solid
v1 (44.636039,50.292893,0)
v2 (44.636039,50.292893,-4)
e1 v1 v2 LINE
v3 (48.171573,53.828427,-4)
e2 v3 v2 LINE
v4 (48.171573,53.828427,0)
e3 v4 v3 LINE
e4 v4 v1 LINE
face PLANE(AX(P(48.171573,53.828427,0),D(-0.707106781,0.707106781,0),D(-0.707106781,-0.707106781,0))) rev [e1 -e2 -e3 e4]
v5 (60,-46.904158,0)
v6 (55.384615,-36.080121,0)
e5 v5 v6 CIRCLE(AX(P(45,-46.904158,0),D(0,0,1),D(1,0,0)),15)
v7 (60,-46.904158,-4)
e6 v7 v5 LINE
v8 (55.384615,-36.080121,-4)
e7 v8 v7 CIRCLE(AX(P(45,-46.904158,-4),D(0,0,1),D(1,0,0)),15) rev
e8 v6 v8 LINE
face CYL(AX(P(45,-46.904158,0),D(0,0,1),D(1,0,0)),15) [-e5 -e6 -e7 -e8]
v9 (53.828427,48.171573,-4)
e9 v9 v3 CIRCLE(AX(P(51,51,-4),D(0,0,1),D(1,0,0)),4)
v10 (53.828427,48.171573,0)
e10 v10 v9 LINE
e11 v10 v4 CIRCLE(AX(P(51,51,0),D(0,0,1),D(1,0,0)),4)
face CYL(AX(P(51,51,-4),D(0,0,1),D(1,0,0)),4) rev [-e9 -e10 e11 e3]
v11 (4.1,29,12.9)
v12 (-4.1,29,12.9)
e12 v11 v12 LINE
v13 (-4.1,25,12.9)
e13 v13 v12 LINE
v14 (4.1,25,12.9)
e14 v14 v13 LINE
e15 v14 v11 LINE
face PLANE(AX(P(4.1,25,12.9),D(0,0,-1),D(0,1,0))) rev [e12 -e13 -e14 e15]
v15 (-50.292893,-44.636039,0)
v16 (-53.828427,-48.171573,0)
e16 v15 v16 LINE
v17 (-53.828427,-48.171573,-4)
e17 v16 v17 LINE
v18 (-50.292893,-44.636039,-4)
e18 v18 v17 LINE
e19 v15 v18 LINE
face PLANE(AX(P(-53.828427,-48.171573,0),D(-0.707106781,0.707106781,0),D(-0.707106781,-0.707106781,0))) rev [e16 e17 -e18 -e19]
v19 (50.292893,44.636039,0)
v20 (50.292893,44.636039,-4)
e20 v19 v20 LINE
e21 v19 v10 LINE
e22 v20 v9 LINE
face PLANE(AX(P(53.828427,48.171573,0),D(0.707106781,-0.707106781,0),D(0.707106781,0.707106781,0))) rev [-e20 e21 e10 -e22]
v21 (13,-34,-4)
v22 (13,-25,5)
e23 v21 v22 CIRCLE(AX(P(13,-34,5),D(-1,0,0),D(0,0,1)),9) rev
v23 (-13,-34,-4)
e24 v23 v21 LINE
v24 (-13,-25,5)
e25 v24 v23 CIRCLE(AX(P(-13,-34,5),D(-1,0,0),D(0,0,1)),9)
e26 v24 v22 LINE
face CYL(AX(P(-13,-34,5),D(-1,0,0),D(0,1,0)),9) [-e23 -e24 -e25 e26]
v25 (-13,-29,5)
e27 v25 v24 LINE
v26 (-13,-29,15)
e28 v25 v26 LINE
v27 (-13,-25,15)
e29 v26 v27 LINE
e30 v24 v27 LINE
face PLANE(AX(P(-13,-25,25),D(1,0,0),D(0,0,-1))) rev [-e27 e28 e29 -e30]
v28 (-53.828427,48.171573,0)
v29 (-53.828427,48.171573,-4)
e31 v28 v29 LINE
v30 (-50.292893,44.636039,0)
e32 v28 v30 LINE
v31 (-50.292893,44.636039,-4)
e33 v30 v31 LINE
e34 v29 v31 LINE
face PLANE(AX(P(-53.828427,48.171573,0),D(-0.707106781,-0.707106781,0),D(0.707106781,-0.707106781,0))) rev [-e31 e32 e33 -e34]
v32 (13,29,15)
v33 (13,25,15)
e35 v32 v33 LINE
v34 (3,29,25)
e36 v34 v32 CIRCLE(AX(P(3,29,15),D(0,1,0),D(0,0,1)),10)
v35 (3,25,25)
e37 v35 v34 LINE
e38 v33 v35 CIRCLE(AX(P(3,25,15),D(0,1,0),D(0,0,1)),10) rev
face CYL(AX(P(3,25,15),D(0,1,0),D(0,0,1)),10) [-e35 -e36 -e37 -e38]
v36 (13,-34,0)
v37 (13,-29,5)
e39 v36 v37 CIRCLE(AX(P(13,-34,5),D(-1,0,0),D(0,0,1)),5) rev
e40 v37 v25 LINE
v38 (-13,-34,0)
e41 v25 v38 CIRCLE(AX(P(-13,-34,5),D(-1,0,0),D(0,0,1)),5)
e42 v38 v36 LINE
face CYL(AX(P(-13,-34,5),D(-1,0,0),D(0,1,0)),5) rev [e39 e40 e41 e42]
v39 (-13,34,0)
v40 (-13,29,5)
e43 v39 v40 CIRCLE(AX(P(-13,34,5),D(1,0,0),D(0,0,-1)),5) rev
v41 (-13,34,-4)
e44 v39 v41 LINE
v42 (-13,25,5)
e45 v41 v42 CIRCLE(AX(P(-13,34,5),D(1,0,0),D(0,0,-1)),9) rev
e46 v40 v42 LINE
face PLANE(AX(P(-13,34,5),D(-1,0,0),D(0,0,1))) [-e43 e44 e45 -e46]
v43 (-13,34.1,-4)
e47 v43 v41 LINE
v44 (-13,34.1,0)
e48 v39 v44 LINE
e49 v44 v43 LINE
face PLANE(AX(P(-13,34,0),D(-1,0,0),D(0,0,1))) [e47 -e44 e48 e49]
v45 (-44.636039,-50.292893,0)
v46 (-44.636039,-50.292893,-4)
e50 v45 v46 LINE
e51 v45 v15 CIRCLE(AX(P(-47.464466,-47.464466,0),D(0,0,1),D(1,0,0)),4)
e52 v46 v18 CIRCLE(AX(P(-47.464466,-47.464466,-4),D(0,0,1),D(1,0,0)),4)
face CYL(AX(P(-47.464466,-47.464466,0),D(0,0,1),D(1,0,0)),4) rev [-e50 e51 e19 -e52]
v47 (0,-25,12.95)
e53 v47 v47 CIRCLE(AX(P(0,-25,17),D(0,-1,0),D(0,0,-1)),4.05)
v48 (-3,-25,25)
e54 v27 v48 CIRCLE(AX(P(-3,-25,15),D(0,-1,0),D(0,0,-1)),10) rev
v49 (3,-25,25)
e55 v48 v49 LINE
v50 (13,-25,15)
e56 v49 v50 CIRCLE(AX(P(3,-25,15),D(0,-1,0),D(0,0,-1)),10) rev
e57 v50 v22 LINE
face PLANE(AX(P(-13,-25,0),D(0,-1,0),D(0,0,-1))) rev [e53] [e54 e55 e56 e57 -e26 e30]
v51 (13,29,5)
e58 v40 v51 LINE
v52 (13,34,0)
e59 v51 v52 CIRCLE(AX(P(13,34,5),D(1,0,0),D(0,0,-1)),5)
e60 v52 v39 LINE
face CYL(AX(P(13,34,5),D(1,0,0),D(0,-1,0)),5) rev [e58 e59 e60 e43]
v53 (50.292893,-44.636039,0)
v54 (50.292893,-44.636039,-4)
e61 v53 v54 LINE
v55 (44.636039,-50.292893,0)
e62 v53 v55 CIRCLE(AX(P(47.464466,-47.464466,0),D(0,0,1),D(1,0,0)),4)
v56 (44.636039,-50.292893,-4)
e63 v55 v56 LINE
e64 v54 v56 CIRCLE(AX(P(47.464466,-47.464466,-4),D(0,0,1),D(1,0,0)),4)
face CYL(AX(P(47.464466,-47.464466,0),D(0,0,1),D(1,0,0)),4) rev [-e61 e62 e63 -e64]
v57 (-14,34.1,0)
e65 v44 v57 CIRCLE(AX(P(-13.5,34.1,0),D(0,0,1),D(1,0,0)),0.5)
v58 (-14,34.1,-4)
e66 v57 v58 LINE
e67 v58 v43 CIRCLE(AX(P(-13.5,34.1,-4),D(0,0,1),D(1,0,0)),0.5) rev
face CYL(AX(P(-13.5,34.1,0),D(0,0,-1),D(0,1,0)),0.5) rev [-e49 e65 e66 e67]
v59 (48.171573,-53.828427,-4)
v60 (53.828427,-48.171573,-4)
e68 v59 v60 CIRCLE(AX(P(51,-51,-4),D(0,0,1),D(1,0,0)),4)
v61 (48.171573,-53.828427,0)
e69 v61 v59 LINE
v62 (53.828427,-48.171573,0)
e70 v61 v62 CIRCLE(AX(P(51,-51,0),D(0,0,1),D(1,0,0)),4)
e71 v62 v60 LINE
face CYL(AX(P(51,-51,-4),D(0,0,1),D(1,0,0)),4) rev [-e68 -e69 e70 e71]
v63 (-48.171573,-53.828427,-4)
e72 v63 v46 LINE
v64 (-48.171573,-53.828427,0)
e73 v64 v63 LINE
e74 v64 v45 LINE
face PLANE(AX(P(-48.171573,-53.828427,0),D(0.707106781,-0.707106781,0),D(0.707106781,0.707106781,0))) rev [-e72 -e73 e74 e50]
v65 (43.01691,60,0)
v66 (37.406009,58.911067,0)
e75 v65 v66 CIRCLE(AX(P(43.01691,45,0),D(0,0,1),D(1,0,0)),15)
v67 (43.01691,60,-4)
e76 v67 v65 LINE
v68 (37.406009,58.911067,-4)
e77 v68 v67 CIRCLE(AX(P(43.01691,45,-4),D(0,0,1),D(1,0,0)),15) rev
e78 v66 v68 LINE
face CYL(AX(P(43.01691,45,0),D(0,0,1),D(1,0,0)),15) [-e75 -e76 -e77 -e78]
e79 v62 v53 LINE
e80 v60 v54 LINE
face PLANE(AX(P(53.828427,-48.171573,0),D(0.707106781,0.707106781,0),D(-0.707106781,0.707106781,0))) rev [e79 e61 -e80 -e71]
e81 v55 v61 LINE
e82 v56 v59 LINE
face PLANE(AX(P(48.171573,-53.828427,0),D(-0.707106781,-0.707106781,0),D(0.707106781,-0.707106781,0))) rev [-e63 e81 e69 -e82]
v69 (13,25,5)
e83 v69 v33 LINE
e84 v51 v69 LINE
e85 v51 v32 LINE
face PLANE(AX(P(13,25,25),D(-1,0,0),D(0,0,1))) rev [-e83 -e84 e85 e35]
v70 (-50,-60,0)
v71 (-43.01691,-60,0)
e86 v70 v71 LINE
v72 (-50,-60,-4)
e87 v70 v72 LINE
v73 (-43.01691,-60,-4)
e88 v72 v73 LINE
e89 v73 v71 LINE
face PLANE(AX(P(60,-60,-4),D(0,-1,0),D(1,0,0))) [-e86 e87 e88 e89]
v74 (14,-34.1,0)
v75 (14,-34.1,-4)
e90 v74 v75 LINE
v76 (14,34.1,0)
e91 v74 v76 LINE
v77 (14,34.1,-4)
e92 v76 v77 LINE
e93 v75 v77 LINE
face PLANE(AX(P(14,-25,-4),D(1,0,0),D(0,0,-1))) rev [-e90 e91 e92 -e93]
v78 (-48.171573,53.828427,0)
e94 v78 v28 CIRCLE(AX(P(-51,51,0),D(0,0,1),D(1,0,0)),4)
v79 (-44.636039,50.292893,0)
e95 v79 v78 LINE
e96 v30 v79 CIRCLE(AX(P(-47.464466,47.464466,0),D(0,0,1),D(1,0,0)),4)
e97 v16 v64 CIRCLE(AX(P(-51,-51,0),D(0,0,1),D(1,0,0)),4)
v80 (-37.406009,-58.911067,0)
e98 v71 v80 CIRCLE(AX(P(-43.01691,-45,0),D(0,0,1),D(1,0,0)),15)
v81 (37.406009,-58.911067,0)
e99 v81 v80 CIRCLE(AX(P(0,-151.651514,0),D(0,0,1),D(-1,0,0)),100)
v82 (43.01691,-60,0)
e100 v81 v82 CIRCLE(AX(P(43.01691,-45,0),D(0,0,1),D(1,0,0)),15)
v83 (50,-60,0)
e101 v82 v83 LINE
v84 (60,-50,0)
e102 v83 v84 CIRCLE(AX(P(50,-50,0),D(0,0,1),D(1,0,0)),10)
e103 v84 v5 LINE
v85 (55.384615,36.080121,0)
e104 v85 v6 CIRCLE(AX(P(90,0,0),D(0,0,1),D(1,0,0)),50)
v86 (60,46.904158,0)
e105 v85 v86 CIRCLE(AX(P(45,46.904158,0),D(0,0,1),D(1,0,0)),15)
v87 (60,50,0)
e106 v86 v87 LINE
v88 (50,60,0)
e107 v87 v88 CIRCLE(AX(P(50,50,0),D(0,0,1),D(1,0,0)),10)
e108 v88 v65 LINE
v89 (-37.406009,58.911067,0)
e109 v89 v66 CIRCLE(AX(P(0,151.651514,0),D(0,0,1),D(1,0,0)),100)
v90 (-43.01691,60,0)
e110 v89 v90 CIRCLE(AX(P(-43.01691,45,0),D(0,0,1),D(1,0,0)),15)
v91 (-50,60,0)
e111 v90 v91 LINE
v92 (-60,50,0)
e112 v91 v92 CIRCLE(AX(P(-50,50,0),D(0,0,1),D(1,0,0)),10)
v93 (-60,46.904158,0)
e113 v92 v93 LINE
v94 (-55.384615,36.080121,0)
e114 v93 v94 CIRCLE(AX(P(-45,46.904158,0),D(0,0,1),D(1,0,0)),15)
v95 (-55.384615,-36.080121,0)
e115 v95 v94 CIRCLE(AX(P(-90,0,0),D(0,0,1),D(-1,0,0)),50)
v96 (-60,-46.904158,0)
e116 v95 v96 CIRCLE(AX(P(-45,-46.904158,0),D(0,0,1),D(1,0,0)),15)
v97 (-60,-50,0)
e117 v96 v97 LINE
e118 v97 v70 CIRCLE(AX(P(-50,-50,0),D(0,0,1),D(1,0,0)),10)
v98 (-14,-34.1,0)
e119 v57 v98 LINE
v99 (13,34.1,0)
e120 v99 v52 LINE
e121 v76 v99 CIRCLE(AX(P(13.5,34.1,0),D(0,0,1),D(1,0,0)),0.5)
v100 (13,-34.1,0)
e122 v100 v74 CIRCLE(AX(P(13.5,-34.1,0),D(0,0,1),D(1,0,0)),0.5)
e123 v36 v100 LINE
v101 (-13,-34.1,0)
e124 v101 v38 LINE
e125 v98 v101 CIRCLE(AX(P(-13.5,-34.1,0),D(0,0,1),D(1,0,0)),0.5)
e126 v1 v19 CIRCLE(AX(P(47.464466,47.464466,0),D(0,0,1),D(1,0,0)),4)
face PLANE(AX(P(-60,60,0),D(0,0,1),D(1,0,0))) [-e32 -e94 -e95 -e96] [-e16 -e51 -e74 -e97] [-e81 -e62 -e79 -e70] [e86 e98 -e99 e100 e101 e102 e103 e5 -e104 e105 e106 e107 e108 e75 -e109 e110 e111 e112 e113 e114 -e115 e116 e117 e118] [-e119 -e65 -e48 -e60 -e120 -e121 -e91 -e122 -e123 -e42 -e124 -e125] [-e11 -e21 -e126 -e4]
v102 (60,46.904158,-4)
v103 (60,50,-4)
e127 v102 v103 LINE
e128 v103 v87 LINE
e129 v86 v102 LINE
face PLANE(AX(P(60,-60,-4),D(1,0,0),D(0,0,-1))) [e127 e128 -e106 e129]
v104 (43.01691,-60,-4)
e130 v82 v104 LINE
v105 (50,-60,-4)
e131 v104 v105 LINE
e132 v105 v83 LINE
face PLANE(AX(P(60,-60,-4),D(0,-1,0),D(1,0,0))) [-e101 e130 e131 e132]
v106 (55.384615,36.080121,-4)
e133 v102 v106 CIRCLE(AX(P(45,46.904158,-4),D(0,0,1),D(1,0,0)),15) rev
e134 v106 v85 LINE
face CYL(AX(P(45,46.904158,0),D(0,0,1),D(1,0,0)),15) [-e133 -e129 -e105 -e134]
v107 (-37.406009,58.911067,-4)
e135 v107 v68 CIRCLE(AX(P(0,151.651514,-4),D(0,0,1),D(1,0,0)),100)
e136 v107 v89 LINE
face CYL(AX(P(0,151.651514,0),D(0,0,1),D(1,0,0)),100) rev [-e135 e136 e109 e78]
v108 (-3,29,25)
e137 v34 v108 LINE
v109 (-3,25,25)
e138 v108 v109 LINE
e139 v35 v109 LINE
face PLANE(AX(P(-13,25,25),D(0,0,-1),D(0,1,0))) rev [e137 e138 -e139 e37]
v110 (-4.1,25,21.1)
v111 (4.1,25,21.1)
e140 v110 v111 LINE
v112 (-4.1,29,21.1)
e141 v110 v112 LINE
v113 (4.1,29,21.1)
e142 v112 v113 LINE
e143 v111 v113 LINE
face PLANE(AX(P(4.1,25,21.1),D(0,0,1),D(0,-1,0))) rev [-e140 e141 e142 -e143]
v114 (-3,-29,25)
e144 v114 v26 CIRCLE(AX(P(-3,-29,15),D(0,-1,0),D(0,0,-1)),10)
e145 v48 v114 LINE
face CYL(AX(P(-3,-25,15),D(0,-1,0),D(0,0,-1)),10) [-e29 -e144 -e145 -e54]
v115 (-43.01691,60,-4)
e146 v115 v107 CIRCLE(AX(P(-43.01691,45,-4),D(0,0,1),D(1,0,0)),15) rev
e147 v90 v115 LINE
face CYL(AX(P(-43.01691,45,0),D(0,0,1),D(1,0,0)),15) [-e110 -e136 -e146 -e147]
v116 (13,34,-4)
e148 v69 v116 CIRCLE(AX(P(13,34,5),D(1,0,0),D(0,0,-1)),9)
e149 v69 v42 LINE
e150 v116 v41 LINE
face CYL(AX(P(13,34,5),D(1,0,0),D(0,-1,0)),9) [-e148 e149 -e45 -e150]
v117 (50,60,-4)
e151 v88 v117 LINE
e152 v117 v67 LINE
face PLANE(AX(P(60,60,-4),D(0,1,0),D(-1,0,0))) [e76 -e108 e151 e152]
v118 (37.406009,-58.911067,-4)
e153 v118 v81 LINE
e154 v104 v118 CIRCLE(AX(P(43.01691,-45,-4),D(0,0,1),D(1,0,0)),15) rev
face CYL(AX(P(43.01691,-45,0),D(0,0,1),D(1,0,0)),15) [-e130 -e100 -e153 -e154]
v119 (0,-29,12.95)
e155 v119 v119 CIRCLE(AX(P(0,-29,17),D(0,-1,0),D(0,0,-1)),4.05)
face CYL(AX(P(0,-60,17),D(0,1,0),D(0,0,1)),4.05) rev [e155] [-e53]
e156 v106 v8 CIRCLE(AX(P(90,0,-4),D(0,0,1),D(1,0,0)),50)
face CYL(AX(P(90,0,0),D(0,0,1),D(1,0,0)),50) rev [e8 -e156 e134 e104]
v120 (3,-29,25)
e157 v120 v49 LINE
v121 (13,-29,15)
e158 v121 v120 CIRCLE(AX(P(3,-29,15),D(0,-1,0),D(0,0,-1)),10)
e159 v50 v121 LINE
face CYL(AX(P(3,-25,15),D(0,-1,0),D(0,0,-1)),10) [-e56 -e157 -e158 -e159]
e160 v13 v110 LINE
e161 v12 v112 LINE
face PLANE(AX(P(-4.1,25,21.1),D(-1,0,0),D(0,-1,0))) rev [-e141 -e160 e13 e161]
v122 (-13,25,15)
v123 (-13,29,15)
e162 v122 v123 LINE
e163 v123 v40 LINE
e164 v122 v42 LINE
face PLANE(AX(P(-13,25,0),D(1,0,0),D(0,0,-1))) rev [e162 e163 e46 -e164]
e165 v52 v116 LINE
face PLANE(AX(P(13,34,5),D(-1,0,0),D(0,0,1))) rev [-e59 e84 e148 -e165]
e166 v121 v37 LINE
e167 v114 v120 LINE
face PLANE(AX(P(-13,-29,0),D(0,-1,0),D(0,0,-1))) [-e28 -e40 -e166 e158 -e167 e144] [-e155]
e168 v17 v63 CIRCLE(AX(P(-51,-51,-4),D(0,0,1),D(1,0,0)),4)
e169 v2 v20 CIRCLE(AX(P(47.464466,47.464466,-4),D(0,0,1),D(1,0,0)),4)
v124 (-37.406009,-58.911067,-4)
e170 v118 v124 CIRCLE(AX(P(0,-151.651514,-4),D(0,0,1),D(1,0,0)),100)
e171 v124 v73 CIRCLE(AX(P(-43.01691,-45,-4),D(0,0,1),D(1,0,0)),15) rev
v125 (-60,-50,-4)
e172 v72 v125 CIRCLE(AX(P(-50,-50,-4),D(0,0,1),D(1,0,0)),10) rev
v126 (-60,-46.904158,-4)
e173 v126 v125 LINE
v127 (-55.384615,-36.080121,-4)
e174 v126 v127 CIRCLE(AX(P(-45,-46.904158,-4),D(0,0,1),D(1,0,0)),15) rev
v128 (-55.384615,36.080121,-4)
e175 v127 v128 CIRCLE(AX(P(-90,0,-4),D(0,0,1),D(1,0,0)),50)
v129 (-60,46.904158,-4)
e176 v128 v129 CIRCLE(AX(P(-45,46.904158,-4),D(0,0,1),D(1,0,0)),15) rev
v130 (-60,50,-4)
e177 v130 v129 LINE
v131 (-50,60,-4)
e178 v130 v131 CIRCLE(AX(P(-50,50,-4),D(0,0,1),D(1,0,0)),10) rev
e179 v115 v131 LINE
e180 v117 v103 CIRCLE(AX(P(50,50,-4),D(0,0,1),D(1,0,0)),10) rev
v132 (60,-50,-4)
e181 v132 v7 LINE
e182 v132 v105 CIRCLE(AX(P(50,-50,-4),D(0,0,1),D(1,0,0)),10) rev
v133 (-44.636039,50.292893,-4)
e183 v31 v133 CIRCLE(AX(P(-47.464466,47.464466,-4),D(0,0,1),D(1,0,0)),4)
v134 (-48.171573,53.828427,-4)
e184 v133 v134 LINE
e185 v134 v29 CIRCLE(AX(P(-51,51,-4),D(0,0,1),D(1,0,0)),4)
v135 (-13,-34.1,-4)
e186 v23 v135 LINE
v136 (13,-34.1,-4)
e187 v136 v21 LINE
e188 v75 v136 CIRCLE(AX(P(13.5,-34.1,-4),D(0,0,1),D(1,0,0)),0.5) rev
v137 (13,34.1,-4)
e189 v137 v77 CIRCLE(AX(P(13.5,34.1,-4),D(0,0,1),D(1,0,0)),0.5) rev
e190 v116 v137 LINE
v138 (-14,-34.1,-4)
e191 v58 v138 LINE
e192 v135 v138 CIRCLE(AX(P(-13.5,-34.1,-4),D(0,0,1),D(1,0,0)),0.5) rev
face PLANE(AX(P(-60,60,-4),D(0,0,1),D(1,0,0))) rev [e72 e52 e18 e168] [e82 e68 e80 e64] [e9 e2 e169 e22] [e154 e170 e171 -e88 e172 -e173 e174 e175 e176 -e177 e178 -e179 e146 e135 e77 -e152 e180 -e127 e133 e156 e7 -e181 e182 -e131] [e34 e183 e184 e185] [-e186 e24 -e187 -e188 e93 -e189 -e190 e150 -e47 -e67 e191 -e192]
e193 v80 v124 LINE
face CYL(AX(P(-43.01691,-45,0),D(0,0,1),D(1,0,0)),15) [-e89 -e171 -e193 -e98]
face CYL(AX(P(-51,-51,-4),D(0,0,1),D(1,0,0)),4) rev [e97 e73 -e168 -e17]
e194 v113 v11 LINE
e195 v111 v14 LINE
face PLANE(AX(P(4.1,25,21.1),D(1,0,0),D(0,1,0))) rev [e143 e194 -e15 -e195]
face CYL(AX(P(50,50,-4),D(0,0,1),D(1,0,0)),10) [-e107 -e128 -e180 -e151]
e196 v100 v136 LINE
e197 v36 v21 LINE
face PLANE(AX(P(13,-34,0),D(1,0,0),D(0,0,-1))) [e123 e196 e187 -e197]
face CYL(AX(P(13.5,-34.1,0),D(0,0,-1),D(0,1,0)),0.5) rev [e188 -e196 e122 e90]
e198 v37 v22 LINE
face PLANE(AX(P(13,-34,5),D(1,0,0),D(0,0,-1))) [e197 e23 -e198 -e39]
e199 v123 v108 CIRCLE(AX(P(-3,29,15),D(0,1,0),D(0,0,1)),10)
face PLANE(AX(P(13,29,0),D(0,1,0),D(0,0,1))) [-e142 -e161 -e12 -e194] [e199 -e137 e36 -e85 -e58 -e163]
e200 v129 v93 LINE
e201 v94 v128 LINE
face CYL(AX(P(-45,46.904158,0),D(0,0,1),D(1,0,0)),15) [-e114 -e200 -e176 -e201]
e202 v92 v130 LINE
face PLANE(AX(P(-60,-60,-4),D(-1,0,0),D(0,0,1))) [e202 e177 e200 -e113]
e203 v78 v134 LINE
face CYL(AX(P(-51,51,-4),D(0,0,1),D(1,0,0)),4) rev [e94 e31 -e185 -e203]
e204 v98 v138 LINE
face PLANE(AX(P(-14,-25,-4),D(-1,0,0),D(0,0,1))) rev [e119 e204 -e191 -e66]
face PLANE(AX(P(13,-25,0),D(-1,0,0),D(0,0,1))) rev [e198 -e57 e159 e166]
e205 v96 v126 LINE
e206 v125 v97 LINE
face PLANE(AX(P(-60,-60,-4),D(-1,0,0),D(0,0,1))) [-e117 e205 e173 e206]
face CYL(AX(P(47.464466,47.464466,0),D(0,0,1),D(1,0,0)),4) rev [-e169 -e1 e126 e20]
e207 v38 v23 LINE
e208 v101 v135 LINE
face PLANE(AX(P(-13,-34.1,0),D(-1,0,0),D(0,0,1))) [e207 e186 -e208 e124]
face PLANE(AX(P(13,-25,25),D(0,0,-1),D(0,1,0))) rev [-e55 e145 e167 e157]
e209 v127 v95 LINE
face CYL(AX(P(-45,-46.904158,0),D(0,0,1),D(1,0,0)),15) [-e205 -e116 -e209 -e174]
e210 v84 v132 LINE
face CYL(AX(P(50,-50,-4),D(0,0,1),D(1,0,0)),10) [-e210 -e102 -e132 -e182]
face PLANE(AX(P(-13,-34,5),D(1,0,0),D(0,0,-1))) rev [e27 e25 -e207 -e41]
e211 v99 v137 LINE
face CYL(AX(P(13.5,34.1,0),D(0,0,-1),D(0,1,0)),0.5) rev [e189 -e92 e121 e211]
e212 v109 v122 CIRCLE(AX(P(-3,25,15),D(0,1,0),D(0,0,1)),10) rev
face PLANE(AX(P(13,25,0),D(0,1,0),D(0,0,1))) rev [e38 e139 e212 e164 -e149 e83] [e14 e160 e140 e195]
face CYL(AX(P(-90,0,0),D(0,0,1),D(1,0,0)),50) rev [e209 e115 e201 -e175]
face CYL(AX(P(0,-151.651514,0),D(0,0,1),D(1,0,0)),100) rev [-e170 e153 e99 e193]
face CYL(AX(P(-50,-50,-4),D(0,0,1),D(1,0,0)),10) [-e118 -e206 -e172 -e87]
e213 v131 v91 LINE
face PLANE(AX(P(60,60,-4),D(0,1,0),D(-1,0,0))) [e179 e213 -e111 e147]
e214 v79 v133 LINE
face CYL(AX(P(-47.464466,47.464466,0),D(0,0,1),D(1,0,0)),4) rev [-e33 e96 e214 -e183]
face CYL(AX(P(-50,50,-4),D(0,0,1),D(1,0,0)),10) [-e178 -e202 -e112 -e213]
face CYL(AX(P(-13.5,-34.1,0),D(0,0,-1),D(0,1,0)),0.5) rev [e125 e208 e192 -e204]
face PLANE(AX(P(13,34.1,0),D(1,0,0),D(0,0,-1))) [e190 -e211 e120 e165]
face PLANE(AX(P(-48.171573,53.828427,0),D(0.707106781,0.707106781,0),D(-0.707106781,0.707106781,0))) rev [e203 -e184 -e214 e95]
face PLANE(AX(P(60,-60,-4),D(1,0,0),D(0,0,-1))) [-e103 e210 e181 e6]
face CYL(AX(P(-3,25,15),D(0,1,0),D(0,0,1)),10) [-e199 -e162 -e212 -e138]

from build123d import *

# Parameters (mm, degrees)
SKETCH_1_W                   = 120
SKETCH_1_H                   = 120
SKETCH_1_W_2                 = 28
SKETCH_1_H_2                 = 50
SM_BASE_FLANGE_1_DEPTH       = 4
SM_START                     = -5
SM_EDGE_FLANGE_1_DEPTH       = 10
SM_EDGE_FLANGE_1_2_OUTLINE_W = 26
SM_EDGE_FLANGE_1_2_OUTLINE_H = 4
SM_EDGE_FLANGE_1_2_DEPTH     = 1.41096
SM_START_2                   = 5
SM_EDGE_FLANGE_1_3_OUTLINE_W = 26
SM_EDGE_FLANGE_1_3_OUTLINE_H = 4
SM_EDGE_FLANGE_1_3_DEPTH     = 20
SM_START_3                   = -13
SM_EDGE_FLANGE_1_4_DEPTH     = 26
SM_EDGE_FLANGE_1_5_DEPTH     = 26
CUT_EXTRUDE_1_DEPTH          = 89.459030065
CUT_EXTRUDE_1_DEPTH_BACK     = 89.459030065
SKETCH_10_R                  = 4.05
SKETCH_12_W                  = 8.2
SKETCH_12_H                  = 8.2
CUT_EXTRUDE_3_DEPTH          = 4
FILLET_1_R                   = 10
SKETCH_11_R                  = 4
CUT_EXTRUDE_2_DEPTH          = 4
CUT_EXTRUDE_4_DEPTH          = 4
CUT_EXTRUDE_5_DEPTH          = 4
FILLET_2_R                   = 15


with BuildPart() as part:
    # Базовая кромка1: sheet metal written as solids
    # Sketch 1 → Базовая кромка1 (new body)
    with BuildSketch(Plane.XY):
        Rectangle(SKETCH_1_W, SKETCH_1_H)
        Rectangle(SKETCH_1_W_2, SKETCH_1_H_2, mode=Mode.SUBTRACT)
    extrude(amount=-SM_BASE_FLANGE_1_DEPTH)

    # Ребро-кромка1: read off the stored shape, not the designer's step
    # Ребро-кромка1 outline → Ребро-кромка1 (cut)
    with BuildSketch(Plane.XY.offset(SM_START)):
        with BuildLine():
            ThreePointArc((-13, 34.1), (-13.5, 34.6), (-14, 34.1))
            Line((-14, 34.1), (-14, 25))
            Line((-14, 25), (-13, 25))
            Line((-13, 25), (-13, 34.1))
        make_face()
        with BuildLine():
            Line((-13, -25), (-14, -25))
            Line((-14, -25), (-14, -34.1))
            ThreePointArc((-14, -34.1), (-13.5, -34.6), (-13, -34.1))
            Line((-13, -34.1), (-13, -25))
        make_face()
        with BuildLine():
            Line((13, 34.1), (13, 25))
            Line((13, 25), (14, 25))
            Line((14, 25), (14, 34.1))
            ThreePointArc((14, 34.1), (13.5, 34.6), (13, 34.1))
        make_face()
        with BuildLine():
            Line((14, -25), (13, -25))
            Line((13, -25), (13, -34.1))
            ThreePointArc((13, -34.1), (13.5, -34.6), (14, -34.1))
            Line((14, -34.1), (14, -25))
        make_face()
    extrude(amount=SM_EDGE_FLANGE_1_DEPTH, mode=Mode.SUBTRACT)

    # Sm Edge Flange 1 2 outline → Sm Edge Flange 1 2 (cut)
    with BuildSketch(Plane.XY.offset(SM_START)):
        with Locations((0, 27)):
            Rectangle(SM_EDGE_FLANGE_1_2_OUTLINE_W, SM_EDGE_FLANGE_1_2_OUTLINE_H)
        with Locations((0, -27)):
            Rectangle(SM_EDGE_FLANGE_1_2_OUTLINE_W, SM_EDGE_FLANGE_1_2_OUTLINE_H)
    extrude(amount=SM_EDGE_FLANGE_1_2_DEPTH, mode=Mode.SUBTRACT)

    # Sm Edge Flange 1 4 outline → Sm Edge Flange 1 4 (cut)
    with BuildSketch(Plane.YZ.offset(SM_START_3)):
        with BuildLine():
            ThreePointArc((34, -4), (29.757359313, -2.937253933), (26.516685226, 0))
            Line((26.516685226, 0), (25, 0))
            Line((25, 0), (25, -3.58904))
            Line((25, -3.58904), (29, -3.58904))
            Line((29, -3.58904), (29, -4))
            Line((29, -4), (34, -4))
        make_face()
        with BuildLine():
            Line((-25, -3.58904), (-25, 0))
            Line((-25, 0), (-26.516685226, 0))
            ThreePointArc((-26.516685226, 0), (-29.757359313, -2.937253933), (-34, -4))
            Line((-34, -4), (-29, -4))
            Line((-29, -4), (-29, -3.58904))
            Line((-29, -3.58904), (-25, -3.58904))
        make_face()
    extrude(amount=SM_EDGE_FLANGE_1_4_DEPTH, mode=Mode.SUBTRACT)



with BuildPart() as body_2:
    # Sm Edge Flange 1 3 outline → Sm Edge Flange 1 3 (new body)
    with BuildSketch(Plane.XY.offset(SM_START_2)):
        with Locations((0, 27)):
            Rectangle(SM_EDGE_FLANGE_1_3_OUTLINE_W, SM_EDGE_FLANGE_1_3_OUTLINE_H)
        with Locations((0, -27)):
            Rectangle(SM_EDGE_FLANGE_1_3_OUTLINE_W, SM_EDGE_FLANGE_1_3_OUTLINE_H)
    extrude(amount=SM_EDGE_FLANGE_1_3_DEPTH)


with BuildPart() as part_1:
    add(part.part)

    add(body_2.part)  # Sm Edge Flange 1 5 merges body 2
    # Sm Edge Flange 1 5 outline → Sm Edge Flange 1 5 (add)
    with BuildSketch(Plane.YZ.offset(SM_START_3)):
        with BuildLine():
            Line((29, 5), (25, 5))
            ThreePointArc((25, 5), (25.38751392, 2.38751392), (26.516685226, 0))
            Line((26.516685226, 0), (34, 0))
            ThreePointArc((34, 0), (30.464466094, 1.464466094), (29, 5))
        make_face()
        with BuildLine():
            Line((-34, 0), (-26.516685226, 0))
            ThreePointArc((-26.516685226, 0), (-25.38751392, 2.38751392), (-25, 5))
            Line((-25, 5), (-29, 5))
            ThreePointArc((-29, 5), (-30.464466094, 1.464466094), (-34, 0))
        make_face()
    extrude(amount=SM_EDGE_FLANGE_1_5_DEPTH)

    # Эскиз10 → Вырез-Вытянуть1 (cut, two sides: drawn at the far end of the back side and taken through both)
    with BuildSketch(Plane(origin=(0, 0, 0), x_dir=(1, 0, 0), z_dir=(0, 1, 0)).offset(-CUT_EXTRUDE_1_DEPTH_BACK)):
        with Locations(Location((0, -17, 0), (0, 0, 90))):
            Circle(SKETCH_10_R)
    extrude(amount=CUT_EXTRUDE_1_DEPTH + CUT_EXTRUDE_1_DEPTH_BACK, mode=Mode.SUBTRACT)

    # Эскиз12 → Вырез-Вытянуть3 (cut)
    with BuildSketch(Plane(origin=(0, 29, 0), x_dir=(1, 0, 0), z_dir=(0, 1, 0))):
        with Locations((0, -17)):
            Rectangle(SKETCH_12_W, SKETCH_12_H)
    extrude(amount=-CUT_EXTRUDE_3_DEPTH, mode=Mode.SUBTRACT)

    # Скругление1
    fillet_1_edges = [part_1.edges().sort_by_distance(p)[0] for p in [
        (13, -27, 25),
        (-13, -27, 25),
        (-60, 60, -2),
        (60, 60, -2),
        (60, -60, -2),
        (-60, -60, -2),
        (-13, 27, 25),
        (13, 27, 25),
    ]]
    fillet(fillet_1_edges, radius=FILLET_1_R)

    # Эскиз11 → Вырез-Вытянуть2 (cut)
    with BuildSketch(Plane.XY):
        with Locations((-51, 51)):
            Circle(SKETCH_11_R)
        with Locations((51, 51)):
            Circle(SKETCH_11_R)
        with Locations((-51, -51)):
            Circle(SKETCH_11_R)
        with Locations((51, -51)):
            Circle(SKETCH_11_R)
    extrude(amount=-CUT_EXTRUDE_2_DEPTH, mode=Mode.SUBTRACT)

    # Эскиз13 → Вырез-Вытянуть4 (cut)
    with BuildSketch(Plane.XY):
        with BuildLine():
            Line((-48.171572875, 53.828427125), (-44.636038969, 50.292893219))
            ThreePointArc((-44.636038969, 50.292893219), (-44.636038969, 44.636038969), (-50.292893219, 44.636038969))
            Line((-50.292893219, 44.636038969), (-53.828427125, 48.171572875))
            ThreePointArc((-53.828427125, 48.171572875), (-53.828427125, 53.828427125), (-48.171572875, 53.828427125))
        make_face()
        with BuildLine():
            Line((53.828427125, 48.171572875), (50.292893219, 44.636038969))
            ThreePointArc((50.292893219, 44.636038969), (44.636038969, 44.636038969), (44.636038969, 50.292893219))
            Line((44.636038969, 50.292893219), (48.171572875, 53.828427125))
            ThreePointArc((48.171572875, 53.828427125), (53.828427125, 53.828427125), (53.828427125, 48.171572875))
        make_face()
        with BuildLine():
            Line((-53.828427125, -48.171572875), (-50.292893219, -44.636038969))
            ThreePointArc((-50.292893219, -44.636038969), (-44.636038969, -44.636038969), (-44.636038969, -50.292893219))
            Line((-44.636038969, -50.292893219), (-48.171572875, -53.828427125))
            ThreePointArc((-48.171572875, -53.828427125), (-53.828427125, -53.828427125), (-53.828427125, -48.171572875))
        make_face()
        with BuildLine():
            Line((48.171572875, -53.828427125), (44.636038969, -50.292893219))
            ThreePointArc((44.636038969, -50.292893219), (44.636038969, -44.636038969), (50.292893219, -44.636038969))
            Line((50.292893219, -44.636038969), (53.828427125, -48.171572875))
            ThreePointArc((53.828427125, -48.171572875), (53.828427125, -53.828427125), (48.171572875, -53.828427125))
        make_face()
    extrude(amount=-CUT_EXTRUDE_4_DEPTH, mode=Mode.SUBTRACT)

    # Эскиз14 → Вырез-Вытянуть5 (cut)
    with BuildSketch(Plane.XY):
        with BuildLine():
            Line((-60, 40), (-60, -40))
            ThreePointArc((-60, -40), (-40, 0), (-60, 40))
        make_face()
        with BuildLine():
            Line((60, 40), (60, -40))
            ThreePointArc((60, -40), (40, 0), (60, 40))
        make_face()
        with BuildLine():
            Line((-40, 60), (40, 60))
            ThreePointArc((40, 60), (0, 51.651513899), (-40, 60))
        make_face()
        with BuildLine():
            Line((-40, -60), (40, -60))
            ThreePointArc((40, -60), (0, -51.651513899), (-40, -60))
        make_face()
    extrude(amount=-CUT_EXTRUDE_5_DEPTH, mode=Mode.SUBTRACT)

    # Скругление2
    fillet_2_edges = [part_1.edges().sort_by_distance(p)[0] for p in [
        (40, 60, -2),
        (-40, 60, -2),
        (60, -40, -2),
        (60, 40, -2),
        (-40, -60, -2),
        (40, -60, -2),
        (-60, 40, -2),
        (-60, -40, -2),
    ]]
    fillet(fillet_2_edges, radius=FILLET_2_R)


solid = part_1.part
